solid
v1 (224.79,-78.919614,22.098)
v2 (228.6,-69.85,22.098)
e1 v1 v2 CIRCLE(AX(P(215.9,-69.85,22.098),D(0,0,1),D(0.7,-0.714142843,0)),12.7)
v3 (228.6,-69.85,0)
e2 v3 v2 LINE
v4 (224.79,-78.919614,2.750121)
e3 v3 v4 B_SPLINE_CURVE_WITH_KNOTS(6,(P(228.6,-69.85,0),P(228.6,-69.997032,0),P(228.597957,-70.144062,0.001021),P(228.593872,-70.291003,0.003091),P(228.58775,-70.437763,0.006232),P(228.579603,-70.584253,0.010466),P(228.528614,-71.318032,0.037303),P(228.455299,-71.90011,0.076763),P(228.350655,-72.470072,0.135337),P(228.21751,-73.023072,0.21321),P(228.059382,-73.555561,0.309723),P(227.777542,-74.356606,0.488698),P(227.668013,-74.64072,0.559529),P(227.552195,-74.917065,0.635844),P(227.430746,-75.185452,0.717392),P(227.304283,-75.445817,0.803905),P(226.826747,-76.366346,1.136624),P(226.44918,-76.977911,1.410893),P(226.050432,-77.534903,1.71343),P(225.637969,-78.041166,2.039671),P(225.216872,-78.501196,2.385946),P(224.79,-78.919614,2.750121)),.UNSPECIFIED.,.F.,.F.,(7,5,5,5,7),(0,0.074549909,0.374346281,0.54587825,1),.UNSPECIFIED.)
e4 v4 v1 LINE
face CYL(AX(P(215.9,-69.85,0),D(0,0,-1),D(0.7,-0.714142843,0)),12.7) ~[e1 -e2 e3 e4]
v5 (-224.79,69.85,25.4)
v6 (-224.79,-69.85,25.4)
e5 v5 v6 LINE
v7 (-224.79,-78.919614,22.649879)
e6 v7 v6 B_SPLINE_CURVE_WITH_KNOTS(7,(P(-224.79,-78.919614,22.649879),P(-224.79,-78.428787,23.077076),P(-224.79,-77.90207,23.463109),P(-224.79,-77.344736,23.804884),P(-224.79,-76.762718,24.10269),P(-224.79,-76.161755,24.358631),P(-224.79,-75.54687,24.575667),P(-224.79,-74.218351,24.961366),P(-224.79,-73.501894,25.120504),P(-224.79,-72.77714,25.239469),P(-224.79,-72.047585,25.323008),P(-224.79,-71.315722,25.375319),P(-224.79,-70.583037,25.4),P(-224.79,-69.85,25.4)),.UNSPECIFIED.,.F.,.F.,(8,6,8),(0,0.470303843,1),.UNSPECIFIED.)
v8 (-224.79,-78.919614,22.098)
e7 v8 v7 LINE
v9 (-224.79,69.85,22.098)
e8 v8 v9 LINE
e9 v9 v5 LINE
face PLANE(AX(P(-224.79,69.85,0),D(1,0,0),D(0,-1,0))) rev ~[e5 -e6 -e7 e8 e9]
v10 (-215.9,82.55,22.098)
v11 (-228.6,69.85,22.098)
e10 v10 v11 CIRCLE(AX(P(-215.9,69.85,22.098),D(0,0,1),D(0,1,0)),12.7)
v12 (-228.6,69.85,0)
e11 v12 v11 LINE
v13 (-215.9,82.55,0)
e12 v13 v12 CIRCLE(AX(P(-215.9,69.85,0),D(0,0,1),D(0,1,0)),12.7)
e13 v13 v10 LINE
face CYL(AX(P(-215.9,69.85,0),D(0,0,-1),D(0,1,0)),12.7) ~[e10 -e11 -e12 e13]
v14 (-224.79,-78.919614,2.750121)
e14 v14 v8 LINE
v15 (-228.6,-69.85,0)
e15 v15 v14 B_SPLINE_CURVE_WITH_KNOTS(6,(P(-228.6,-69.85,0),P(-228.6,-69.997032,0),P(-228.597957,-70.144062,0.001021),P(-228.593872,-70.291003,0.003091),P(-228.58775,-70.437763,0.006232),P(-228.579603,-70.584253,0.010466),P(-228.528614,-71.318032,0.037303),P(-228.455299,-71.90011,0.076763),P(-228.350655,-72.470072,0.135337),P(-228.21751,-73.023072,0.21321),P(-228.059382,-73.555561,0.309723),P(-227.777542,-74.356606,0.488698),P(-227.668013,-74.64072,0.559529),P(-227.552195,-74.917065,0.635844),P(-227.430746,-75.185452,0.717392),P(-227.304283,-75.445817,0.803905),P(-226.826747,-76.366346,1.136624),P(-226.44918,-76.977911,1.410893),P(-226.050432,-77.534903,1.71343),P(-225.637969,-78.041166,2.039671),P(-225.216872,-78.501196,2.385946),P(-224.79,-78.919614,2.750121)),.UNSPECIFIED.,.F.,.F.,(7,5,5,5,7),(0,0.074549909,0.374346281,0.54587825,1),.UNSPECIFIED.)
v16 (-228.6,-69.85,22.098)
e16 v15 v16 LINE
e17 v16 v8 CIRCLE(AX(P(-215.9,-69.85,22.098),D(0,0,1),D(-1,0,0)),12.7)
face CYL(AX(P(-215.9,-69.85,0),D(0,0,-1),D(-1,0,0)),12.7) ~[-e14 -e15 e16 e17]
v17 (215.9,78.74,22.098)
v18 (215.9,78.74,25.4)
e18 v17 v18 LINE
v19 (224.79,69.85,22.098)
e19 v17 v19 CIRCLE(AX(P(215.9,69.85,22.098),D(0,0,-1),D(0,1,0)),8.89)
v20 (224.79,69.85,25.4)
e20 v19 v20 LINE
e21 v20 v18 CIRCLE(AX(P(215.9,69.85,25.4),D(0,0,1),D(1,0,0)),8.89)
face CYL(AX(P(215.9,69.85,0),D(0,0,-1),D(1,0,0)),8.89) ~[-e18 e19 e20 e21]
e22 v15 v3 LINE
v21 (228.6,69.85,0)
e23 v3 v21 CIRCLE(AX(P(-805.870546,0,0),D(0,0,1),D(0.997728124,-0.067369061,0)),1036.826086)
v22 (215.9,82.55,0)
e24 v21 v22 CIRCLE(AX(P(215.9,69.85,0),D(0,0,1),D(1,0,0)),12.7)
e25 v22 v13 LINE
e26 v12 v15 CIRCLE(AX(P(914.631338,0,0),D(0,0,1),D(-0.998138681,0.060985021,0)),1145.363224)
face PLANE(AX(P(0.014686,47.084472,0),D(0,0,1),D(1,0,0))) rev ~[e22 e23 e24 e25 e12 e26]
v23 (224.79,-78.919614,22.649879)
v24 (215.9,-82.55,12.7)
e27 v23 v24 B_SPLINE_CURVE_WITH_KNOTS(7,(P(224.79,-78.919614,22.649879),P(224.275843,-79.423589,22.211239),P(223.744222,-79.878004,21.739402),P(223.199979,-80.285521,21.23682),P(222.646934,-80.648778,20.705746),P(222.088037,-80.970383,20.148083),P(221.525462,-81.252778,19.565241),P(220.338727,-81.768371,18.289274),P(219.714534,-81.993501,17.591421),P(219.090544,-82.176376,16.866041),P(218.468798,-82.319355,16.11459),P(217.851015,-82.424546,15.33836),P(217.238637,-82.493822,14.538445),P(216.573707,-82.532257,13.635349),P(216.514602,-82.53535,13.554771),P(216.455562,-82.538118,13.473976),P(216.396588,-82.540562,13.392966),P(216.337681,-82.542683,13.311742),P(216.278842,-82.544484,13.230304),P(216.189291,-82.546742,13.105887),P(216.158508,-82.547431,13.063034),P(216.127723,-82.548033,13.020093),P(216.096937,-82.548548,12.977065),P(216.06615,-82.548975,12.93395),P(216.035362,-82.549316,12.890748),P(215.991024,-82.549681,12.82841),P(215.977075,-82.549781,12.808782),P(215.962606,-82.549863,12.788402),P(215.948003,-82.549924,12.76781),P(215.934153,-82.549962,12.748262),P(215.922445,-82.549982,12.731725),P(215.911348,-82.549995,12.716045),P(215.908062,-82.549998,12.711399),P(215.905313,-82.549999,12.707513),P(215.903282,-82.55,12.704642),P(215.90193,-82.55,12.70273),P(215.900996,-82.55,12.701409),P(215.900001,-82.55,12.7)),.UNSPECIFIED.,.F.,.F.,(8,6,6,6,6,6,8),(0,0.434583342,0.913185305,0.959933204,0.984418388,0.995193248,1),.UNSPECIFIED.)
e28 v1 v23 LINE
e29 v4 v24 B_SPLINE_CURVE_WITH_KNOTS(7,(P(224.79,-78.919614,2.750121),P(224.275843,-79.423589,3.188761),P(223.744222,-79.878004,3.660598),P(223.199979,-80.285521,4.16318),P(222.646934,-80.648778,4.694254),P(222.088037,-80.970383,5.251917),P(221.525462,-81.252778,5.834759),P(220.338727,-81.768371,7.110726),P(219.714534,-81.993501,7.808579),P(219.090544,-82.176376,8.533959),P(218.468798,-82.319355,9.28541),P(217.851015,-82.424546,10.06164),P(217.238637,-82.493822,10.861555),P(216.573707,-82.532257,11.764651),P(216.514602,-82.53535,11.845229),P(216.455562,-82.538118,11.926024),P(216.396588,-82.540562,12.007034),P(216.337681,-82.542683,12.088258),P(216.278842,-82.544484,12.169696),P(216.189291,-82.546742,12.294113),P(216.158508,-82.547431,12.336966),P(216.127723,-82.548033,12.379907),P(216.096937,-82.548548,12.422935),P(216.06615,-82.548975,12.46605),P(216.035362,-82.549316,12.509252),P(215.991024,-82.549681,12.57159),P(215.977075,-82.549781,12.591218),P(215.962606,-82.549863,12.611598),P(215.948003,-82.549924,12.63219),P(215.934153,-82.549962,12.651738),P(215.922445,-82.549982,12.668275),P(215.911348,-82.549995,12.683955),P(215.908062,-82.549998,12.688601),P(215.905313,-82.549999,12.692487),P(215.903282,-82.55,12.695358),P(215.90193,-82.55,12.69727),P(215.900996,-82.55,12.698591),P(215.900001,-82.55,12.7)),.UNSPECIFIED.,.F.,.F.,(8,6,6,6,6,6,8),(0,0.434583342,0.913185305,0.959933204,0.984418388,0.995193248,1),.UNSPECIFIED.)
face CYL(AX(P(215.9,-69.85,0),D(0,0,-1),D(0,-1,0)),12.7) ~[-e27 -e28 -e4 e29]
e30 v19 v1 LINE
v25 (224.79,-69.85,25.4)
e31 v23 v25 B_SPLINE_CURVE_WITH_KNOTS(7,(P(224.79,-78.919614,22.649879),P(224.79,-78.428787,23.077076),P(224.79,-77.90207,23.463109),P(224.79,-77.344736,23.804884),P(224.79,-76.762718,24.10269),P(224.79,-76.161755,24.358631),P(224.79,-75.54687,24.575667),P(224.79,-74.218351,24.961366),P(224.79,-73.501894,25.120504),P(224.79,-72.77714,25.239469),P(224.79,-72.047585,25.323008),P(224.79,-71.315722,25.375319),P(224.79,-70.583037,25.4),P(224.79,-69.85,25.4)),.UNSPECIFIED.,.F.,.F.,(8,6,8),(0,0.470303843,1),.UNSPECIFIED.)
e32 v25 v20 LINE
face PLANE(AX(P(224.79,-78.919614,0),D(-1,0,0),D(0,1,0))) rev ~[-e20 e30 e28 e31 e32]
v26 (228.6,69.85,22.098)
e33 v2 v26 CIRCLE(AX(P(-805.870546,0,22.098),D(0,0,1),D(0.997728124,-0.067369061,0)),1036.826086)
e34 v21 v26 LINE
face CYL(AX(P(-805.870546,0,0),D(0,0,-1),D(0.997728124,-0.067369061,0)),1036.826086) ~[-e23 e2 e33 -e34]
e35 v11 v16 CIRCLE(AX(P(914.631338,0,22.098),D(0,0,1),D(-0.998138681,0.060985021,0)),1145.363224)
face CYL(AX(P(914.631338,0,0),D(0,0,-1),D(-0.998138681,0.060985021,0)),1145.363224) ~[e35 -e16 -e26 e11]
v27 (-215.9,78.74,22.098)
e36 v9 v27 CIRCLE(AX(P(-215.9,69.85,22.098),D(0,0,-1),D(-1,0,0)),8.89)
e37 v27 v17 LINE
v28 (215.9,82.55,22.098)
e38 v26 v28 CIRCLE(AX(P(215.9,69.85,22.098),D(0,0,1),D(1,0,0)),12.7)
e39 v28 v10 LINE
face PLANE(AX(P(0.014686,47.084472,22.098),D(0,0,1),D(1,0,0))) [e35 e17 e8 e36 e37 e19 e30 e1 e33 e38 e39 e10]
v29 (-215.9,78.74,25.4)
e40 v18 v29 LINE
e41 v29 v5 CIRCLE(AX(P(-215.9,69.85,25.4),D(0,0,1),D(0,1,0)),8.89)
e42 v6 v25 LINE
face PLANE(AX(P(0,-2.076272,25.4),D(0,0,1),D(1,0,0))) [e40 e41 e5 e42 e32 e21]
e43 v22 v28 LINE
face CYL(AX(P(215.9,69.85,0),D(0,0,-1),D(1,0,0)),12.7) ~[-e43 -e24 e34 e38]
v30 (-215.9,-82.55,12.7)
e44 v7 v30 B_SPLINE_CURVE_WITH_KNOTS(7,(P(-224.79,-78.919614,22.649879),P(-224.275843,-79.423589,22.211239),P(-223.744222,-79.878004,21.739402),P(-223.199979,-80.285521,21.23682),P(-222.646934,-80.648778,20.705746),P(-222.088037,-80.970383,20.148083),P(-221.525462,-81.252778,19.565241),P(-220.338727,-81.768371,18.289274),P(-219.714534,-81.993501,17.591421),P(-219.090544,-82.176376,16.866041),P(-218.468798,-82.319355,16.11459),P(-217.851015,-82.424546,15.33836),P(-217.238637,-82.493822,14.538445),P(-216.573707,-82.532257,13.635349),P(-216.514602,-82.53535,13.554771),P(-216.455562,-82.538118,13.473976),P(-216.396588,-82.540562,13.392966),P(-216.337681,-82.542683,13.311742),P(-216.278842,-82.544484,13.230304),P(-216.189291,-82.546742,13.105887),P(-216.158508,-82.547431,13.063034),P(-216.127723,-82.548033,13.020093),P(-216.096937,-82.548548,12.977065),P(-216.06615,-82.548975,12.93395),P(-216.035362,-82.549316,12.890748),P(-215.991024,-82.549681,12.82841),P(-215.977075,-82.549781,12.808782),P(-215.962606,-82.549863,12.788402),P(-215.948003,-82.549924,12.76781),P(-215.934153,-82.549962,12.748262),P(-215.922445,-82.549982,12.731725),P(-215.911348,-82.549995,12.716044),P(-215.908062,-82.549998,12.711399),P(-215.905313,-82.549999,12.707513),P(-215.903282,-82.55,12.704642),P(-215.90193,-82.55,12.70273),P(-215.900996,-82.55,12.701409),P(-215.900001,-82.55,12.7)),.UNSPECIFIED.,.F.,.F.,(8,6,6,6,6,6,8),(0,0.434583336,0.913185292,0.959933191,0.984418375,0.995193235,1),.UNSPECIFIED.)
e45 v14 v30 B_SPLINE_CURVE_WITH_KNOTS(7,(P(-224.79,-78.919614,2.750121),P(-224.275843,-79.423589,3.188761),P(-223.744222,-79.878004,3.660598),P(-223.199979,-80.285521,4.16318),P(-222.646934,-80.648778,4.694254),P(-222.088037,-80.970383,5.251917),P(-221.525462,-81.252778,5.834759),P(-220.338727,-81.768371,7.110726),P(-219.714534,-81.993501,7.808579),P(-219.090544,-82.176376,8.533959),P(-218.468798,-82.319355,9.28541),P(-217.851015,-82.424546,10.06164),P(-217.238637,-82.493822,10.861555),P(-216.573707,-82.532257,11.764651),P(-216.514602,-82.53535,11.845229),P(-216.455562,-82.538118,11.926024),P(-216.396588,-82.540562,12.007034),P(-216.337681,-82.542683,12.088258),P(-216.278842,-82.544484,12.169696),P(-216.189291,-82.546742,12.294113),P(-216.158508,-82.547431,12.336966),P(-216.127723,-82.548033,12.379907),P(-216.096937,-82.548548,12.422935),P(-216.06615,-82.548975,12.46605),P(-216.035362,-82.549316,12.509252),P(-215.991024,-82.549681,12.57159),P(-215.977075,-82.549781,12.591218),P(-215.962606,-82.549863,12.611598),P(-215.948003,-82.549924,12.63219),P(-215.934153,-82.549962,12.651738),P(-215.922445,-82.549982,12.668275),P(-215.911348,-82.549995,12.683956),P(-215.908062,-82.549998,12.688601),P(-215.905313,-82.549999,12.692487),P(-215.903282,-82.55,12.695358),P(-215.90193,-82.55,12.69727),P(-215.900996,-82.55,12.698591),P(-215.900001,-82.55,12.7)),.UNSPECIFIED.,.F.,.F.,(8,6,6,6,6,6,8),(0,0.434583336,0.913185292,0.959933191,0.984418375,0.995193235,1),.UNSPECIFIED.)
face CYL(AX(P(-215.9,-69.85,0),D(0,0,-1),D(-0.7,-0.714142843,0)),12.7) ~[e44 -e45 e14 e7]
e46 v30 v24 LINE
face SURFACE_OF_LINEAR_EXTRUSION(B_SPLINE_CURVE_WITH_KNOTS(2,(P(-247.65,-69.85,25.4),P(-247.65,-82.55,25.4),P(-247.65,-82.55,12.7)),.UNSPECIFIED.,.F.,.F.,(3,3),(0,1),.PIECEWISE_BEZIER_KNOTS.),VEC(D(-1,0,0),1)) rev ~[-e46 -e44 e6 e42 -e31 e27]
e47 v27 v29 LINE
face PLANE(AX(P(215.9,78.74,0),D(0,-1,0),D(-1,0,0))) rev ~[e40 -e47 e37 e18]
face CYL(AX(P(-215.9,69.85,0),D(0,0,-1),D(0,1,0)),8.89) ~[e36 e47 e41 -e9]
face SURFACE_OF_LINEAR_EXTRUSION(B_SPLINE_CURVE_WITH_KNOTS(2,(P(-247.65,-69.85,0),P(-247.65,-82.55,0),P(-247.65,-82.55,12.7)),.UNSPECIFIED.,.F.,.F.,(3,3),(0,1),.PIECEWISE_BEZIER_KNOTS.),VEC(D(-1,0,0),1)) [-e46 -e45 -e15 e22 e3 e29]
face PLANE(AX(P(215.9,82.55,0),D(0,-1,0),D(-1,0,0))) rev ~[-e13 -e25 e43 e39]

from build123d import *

# Parameters (mm, degrees)
F1_DEPTH    = 25.4
F2_DEPTH    = 22.098
F3_T1_DEPTH = 495.3


# Not quite as in the source:
# - a fillet or chamfer that OpenCascade refuses, or shapes differently, is made with other operations: its cross-section is extruded or revolved along the edge and cut away or added


with BuildPart() as f1:
    # F0 (on Top) → F1 (new body)
    with BuildSketch(Plane.XY):
        with BuildLine():
            ThreePointArc((215.9, -82.55), (220.7013488144, -81.6074252948), (224.79, -78.9196141042))
            Line((224.79, -78.9196141042), (224.79, -69.85))
            Line((224.79, -69.85), (224.79, 69.85))
            ThreePointArc((224.79, 69.85), (222.1861792847, 76.1361792847), (215.9, 78.74))
            Line((215.9, 78.74), (-215.9, 78.74))
            ThreePointArc((-215.9, 78.74), (-222.1861792847, 76.1361792847), (-224.79, 69.85))
            Line((-224.79, 69.85), (-224.79, -69.85))
            Line((-224.79, -69.85), (-224.79, -78.9196141042))
            ThreePointArc((-224.79, -78.9196141042), (-220.7013488144, -81.6074252948), (-215.9, -82.55))
            Line((-215.9, -82.55), (215.9, -82.55))
        make_face()
    extrude(amount=F1_DEPTH)

    # F0 (on Top) → F2 (join)
    with BuildSketch(Plane.XY):
        with BuildLine():
            ThreePointArc((228.6, 69.85), (224.8802561211, 78.8302561211), (215.9, 82.55))
            Line((215.9, 82.55), (-215.9, 82.55))
            ThreePointArc((-215.9, 82.55), (-224.8802561211, 78.8302561211), (-228.6, 69.85))
            ThreePointArc((-228.6, 69.85), (-230.7318859092, 0), (-228.6, -69.85))
            ThreePointArc((-228.6, -69.85), (-227.6088214608, -74.7686888497), (-224.79, -78.9196141042))
            Line((-224.79, -78.9196141042), (-224.79, -69.85))
            Line((-224.79, -69.85), (-224.79, 69.85))
            ThreePointArc((-224.79, 69.85), (-222.1861792847, 76.1361792847), (-215.9, 78.74))
            Line((-215.9, 78.74), (215.9, 78.74))
            ThreePointArc((215.9, 78.74), (222.1861792847, 76.1361792847), (224.79, 69.85))
            Line((224.79, 69.85), (224.79, -69.85))
            Line((224.79, -69.85), (224.79, -78.9196141042))
            ThreePointArc((224.79, -78.9196141042), (227.6088214608, -74.7686888497), (228.6, -69.85))
            ThreePointArc((228.6, -69.85), (230.9555402084, 0), (228.6, 69.85))
        make_face()
    extrude(amount=F2_DEPTH)

    # F3: fillet of radius 12.7 on 4 edges, made by hand

    # F3_s2 → F3_t1 (cut)
    with BuildSketch(Plane.YZ.offset(-247.65)):
        with BuildLine():
            add(Edge.make_bspline(
                [(-69.85, 0), (-82.55, 0), (-82.55, 12.7)],
                knots=[0, 0, 0, 1, 1, 1], degree=2, weights=[1, 1, 1]))
            Line((-82.55, 12.7), (-82.55, 0))
            Line((-82.55, 0), (-69.85, 0))
        make_face()
        with BuildLine():
            add(Edge.make_bspline(
                [(-69.85, 25.4), (-82.55, 25.4), (-82.55, 12.7)],
                knots=[0, 0, 0, 1, 1, 1], degree=2, weights=[1, 1, 1]))
            Line((-82.55, 12.7), (-82.55, 25.4))
            Line((-82.55, 25.4), (-69.85, 25.4))
        make_face()
    extrude(amount=F3_T1_DEPTH, mode=Mode.SUBTRACT)


solid = f1.part
